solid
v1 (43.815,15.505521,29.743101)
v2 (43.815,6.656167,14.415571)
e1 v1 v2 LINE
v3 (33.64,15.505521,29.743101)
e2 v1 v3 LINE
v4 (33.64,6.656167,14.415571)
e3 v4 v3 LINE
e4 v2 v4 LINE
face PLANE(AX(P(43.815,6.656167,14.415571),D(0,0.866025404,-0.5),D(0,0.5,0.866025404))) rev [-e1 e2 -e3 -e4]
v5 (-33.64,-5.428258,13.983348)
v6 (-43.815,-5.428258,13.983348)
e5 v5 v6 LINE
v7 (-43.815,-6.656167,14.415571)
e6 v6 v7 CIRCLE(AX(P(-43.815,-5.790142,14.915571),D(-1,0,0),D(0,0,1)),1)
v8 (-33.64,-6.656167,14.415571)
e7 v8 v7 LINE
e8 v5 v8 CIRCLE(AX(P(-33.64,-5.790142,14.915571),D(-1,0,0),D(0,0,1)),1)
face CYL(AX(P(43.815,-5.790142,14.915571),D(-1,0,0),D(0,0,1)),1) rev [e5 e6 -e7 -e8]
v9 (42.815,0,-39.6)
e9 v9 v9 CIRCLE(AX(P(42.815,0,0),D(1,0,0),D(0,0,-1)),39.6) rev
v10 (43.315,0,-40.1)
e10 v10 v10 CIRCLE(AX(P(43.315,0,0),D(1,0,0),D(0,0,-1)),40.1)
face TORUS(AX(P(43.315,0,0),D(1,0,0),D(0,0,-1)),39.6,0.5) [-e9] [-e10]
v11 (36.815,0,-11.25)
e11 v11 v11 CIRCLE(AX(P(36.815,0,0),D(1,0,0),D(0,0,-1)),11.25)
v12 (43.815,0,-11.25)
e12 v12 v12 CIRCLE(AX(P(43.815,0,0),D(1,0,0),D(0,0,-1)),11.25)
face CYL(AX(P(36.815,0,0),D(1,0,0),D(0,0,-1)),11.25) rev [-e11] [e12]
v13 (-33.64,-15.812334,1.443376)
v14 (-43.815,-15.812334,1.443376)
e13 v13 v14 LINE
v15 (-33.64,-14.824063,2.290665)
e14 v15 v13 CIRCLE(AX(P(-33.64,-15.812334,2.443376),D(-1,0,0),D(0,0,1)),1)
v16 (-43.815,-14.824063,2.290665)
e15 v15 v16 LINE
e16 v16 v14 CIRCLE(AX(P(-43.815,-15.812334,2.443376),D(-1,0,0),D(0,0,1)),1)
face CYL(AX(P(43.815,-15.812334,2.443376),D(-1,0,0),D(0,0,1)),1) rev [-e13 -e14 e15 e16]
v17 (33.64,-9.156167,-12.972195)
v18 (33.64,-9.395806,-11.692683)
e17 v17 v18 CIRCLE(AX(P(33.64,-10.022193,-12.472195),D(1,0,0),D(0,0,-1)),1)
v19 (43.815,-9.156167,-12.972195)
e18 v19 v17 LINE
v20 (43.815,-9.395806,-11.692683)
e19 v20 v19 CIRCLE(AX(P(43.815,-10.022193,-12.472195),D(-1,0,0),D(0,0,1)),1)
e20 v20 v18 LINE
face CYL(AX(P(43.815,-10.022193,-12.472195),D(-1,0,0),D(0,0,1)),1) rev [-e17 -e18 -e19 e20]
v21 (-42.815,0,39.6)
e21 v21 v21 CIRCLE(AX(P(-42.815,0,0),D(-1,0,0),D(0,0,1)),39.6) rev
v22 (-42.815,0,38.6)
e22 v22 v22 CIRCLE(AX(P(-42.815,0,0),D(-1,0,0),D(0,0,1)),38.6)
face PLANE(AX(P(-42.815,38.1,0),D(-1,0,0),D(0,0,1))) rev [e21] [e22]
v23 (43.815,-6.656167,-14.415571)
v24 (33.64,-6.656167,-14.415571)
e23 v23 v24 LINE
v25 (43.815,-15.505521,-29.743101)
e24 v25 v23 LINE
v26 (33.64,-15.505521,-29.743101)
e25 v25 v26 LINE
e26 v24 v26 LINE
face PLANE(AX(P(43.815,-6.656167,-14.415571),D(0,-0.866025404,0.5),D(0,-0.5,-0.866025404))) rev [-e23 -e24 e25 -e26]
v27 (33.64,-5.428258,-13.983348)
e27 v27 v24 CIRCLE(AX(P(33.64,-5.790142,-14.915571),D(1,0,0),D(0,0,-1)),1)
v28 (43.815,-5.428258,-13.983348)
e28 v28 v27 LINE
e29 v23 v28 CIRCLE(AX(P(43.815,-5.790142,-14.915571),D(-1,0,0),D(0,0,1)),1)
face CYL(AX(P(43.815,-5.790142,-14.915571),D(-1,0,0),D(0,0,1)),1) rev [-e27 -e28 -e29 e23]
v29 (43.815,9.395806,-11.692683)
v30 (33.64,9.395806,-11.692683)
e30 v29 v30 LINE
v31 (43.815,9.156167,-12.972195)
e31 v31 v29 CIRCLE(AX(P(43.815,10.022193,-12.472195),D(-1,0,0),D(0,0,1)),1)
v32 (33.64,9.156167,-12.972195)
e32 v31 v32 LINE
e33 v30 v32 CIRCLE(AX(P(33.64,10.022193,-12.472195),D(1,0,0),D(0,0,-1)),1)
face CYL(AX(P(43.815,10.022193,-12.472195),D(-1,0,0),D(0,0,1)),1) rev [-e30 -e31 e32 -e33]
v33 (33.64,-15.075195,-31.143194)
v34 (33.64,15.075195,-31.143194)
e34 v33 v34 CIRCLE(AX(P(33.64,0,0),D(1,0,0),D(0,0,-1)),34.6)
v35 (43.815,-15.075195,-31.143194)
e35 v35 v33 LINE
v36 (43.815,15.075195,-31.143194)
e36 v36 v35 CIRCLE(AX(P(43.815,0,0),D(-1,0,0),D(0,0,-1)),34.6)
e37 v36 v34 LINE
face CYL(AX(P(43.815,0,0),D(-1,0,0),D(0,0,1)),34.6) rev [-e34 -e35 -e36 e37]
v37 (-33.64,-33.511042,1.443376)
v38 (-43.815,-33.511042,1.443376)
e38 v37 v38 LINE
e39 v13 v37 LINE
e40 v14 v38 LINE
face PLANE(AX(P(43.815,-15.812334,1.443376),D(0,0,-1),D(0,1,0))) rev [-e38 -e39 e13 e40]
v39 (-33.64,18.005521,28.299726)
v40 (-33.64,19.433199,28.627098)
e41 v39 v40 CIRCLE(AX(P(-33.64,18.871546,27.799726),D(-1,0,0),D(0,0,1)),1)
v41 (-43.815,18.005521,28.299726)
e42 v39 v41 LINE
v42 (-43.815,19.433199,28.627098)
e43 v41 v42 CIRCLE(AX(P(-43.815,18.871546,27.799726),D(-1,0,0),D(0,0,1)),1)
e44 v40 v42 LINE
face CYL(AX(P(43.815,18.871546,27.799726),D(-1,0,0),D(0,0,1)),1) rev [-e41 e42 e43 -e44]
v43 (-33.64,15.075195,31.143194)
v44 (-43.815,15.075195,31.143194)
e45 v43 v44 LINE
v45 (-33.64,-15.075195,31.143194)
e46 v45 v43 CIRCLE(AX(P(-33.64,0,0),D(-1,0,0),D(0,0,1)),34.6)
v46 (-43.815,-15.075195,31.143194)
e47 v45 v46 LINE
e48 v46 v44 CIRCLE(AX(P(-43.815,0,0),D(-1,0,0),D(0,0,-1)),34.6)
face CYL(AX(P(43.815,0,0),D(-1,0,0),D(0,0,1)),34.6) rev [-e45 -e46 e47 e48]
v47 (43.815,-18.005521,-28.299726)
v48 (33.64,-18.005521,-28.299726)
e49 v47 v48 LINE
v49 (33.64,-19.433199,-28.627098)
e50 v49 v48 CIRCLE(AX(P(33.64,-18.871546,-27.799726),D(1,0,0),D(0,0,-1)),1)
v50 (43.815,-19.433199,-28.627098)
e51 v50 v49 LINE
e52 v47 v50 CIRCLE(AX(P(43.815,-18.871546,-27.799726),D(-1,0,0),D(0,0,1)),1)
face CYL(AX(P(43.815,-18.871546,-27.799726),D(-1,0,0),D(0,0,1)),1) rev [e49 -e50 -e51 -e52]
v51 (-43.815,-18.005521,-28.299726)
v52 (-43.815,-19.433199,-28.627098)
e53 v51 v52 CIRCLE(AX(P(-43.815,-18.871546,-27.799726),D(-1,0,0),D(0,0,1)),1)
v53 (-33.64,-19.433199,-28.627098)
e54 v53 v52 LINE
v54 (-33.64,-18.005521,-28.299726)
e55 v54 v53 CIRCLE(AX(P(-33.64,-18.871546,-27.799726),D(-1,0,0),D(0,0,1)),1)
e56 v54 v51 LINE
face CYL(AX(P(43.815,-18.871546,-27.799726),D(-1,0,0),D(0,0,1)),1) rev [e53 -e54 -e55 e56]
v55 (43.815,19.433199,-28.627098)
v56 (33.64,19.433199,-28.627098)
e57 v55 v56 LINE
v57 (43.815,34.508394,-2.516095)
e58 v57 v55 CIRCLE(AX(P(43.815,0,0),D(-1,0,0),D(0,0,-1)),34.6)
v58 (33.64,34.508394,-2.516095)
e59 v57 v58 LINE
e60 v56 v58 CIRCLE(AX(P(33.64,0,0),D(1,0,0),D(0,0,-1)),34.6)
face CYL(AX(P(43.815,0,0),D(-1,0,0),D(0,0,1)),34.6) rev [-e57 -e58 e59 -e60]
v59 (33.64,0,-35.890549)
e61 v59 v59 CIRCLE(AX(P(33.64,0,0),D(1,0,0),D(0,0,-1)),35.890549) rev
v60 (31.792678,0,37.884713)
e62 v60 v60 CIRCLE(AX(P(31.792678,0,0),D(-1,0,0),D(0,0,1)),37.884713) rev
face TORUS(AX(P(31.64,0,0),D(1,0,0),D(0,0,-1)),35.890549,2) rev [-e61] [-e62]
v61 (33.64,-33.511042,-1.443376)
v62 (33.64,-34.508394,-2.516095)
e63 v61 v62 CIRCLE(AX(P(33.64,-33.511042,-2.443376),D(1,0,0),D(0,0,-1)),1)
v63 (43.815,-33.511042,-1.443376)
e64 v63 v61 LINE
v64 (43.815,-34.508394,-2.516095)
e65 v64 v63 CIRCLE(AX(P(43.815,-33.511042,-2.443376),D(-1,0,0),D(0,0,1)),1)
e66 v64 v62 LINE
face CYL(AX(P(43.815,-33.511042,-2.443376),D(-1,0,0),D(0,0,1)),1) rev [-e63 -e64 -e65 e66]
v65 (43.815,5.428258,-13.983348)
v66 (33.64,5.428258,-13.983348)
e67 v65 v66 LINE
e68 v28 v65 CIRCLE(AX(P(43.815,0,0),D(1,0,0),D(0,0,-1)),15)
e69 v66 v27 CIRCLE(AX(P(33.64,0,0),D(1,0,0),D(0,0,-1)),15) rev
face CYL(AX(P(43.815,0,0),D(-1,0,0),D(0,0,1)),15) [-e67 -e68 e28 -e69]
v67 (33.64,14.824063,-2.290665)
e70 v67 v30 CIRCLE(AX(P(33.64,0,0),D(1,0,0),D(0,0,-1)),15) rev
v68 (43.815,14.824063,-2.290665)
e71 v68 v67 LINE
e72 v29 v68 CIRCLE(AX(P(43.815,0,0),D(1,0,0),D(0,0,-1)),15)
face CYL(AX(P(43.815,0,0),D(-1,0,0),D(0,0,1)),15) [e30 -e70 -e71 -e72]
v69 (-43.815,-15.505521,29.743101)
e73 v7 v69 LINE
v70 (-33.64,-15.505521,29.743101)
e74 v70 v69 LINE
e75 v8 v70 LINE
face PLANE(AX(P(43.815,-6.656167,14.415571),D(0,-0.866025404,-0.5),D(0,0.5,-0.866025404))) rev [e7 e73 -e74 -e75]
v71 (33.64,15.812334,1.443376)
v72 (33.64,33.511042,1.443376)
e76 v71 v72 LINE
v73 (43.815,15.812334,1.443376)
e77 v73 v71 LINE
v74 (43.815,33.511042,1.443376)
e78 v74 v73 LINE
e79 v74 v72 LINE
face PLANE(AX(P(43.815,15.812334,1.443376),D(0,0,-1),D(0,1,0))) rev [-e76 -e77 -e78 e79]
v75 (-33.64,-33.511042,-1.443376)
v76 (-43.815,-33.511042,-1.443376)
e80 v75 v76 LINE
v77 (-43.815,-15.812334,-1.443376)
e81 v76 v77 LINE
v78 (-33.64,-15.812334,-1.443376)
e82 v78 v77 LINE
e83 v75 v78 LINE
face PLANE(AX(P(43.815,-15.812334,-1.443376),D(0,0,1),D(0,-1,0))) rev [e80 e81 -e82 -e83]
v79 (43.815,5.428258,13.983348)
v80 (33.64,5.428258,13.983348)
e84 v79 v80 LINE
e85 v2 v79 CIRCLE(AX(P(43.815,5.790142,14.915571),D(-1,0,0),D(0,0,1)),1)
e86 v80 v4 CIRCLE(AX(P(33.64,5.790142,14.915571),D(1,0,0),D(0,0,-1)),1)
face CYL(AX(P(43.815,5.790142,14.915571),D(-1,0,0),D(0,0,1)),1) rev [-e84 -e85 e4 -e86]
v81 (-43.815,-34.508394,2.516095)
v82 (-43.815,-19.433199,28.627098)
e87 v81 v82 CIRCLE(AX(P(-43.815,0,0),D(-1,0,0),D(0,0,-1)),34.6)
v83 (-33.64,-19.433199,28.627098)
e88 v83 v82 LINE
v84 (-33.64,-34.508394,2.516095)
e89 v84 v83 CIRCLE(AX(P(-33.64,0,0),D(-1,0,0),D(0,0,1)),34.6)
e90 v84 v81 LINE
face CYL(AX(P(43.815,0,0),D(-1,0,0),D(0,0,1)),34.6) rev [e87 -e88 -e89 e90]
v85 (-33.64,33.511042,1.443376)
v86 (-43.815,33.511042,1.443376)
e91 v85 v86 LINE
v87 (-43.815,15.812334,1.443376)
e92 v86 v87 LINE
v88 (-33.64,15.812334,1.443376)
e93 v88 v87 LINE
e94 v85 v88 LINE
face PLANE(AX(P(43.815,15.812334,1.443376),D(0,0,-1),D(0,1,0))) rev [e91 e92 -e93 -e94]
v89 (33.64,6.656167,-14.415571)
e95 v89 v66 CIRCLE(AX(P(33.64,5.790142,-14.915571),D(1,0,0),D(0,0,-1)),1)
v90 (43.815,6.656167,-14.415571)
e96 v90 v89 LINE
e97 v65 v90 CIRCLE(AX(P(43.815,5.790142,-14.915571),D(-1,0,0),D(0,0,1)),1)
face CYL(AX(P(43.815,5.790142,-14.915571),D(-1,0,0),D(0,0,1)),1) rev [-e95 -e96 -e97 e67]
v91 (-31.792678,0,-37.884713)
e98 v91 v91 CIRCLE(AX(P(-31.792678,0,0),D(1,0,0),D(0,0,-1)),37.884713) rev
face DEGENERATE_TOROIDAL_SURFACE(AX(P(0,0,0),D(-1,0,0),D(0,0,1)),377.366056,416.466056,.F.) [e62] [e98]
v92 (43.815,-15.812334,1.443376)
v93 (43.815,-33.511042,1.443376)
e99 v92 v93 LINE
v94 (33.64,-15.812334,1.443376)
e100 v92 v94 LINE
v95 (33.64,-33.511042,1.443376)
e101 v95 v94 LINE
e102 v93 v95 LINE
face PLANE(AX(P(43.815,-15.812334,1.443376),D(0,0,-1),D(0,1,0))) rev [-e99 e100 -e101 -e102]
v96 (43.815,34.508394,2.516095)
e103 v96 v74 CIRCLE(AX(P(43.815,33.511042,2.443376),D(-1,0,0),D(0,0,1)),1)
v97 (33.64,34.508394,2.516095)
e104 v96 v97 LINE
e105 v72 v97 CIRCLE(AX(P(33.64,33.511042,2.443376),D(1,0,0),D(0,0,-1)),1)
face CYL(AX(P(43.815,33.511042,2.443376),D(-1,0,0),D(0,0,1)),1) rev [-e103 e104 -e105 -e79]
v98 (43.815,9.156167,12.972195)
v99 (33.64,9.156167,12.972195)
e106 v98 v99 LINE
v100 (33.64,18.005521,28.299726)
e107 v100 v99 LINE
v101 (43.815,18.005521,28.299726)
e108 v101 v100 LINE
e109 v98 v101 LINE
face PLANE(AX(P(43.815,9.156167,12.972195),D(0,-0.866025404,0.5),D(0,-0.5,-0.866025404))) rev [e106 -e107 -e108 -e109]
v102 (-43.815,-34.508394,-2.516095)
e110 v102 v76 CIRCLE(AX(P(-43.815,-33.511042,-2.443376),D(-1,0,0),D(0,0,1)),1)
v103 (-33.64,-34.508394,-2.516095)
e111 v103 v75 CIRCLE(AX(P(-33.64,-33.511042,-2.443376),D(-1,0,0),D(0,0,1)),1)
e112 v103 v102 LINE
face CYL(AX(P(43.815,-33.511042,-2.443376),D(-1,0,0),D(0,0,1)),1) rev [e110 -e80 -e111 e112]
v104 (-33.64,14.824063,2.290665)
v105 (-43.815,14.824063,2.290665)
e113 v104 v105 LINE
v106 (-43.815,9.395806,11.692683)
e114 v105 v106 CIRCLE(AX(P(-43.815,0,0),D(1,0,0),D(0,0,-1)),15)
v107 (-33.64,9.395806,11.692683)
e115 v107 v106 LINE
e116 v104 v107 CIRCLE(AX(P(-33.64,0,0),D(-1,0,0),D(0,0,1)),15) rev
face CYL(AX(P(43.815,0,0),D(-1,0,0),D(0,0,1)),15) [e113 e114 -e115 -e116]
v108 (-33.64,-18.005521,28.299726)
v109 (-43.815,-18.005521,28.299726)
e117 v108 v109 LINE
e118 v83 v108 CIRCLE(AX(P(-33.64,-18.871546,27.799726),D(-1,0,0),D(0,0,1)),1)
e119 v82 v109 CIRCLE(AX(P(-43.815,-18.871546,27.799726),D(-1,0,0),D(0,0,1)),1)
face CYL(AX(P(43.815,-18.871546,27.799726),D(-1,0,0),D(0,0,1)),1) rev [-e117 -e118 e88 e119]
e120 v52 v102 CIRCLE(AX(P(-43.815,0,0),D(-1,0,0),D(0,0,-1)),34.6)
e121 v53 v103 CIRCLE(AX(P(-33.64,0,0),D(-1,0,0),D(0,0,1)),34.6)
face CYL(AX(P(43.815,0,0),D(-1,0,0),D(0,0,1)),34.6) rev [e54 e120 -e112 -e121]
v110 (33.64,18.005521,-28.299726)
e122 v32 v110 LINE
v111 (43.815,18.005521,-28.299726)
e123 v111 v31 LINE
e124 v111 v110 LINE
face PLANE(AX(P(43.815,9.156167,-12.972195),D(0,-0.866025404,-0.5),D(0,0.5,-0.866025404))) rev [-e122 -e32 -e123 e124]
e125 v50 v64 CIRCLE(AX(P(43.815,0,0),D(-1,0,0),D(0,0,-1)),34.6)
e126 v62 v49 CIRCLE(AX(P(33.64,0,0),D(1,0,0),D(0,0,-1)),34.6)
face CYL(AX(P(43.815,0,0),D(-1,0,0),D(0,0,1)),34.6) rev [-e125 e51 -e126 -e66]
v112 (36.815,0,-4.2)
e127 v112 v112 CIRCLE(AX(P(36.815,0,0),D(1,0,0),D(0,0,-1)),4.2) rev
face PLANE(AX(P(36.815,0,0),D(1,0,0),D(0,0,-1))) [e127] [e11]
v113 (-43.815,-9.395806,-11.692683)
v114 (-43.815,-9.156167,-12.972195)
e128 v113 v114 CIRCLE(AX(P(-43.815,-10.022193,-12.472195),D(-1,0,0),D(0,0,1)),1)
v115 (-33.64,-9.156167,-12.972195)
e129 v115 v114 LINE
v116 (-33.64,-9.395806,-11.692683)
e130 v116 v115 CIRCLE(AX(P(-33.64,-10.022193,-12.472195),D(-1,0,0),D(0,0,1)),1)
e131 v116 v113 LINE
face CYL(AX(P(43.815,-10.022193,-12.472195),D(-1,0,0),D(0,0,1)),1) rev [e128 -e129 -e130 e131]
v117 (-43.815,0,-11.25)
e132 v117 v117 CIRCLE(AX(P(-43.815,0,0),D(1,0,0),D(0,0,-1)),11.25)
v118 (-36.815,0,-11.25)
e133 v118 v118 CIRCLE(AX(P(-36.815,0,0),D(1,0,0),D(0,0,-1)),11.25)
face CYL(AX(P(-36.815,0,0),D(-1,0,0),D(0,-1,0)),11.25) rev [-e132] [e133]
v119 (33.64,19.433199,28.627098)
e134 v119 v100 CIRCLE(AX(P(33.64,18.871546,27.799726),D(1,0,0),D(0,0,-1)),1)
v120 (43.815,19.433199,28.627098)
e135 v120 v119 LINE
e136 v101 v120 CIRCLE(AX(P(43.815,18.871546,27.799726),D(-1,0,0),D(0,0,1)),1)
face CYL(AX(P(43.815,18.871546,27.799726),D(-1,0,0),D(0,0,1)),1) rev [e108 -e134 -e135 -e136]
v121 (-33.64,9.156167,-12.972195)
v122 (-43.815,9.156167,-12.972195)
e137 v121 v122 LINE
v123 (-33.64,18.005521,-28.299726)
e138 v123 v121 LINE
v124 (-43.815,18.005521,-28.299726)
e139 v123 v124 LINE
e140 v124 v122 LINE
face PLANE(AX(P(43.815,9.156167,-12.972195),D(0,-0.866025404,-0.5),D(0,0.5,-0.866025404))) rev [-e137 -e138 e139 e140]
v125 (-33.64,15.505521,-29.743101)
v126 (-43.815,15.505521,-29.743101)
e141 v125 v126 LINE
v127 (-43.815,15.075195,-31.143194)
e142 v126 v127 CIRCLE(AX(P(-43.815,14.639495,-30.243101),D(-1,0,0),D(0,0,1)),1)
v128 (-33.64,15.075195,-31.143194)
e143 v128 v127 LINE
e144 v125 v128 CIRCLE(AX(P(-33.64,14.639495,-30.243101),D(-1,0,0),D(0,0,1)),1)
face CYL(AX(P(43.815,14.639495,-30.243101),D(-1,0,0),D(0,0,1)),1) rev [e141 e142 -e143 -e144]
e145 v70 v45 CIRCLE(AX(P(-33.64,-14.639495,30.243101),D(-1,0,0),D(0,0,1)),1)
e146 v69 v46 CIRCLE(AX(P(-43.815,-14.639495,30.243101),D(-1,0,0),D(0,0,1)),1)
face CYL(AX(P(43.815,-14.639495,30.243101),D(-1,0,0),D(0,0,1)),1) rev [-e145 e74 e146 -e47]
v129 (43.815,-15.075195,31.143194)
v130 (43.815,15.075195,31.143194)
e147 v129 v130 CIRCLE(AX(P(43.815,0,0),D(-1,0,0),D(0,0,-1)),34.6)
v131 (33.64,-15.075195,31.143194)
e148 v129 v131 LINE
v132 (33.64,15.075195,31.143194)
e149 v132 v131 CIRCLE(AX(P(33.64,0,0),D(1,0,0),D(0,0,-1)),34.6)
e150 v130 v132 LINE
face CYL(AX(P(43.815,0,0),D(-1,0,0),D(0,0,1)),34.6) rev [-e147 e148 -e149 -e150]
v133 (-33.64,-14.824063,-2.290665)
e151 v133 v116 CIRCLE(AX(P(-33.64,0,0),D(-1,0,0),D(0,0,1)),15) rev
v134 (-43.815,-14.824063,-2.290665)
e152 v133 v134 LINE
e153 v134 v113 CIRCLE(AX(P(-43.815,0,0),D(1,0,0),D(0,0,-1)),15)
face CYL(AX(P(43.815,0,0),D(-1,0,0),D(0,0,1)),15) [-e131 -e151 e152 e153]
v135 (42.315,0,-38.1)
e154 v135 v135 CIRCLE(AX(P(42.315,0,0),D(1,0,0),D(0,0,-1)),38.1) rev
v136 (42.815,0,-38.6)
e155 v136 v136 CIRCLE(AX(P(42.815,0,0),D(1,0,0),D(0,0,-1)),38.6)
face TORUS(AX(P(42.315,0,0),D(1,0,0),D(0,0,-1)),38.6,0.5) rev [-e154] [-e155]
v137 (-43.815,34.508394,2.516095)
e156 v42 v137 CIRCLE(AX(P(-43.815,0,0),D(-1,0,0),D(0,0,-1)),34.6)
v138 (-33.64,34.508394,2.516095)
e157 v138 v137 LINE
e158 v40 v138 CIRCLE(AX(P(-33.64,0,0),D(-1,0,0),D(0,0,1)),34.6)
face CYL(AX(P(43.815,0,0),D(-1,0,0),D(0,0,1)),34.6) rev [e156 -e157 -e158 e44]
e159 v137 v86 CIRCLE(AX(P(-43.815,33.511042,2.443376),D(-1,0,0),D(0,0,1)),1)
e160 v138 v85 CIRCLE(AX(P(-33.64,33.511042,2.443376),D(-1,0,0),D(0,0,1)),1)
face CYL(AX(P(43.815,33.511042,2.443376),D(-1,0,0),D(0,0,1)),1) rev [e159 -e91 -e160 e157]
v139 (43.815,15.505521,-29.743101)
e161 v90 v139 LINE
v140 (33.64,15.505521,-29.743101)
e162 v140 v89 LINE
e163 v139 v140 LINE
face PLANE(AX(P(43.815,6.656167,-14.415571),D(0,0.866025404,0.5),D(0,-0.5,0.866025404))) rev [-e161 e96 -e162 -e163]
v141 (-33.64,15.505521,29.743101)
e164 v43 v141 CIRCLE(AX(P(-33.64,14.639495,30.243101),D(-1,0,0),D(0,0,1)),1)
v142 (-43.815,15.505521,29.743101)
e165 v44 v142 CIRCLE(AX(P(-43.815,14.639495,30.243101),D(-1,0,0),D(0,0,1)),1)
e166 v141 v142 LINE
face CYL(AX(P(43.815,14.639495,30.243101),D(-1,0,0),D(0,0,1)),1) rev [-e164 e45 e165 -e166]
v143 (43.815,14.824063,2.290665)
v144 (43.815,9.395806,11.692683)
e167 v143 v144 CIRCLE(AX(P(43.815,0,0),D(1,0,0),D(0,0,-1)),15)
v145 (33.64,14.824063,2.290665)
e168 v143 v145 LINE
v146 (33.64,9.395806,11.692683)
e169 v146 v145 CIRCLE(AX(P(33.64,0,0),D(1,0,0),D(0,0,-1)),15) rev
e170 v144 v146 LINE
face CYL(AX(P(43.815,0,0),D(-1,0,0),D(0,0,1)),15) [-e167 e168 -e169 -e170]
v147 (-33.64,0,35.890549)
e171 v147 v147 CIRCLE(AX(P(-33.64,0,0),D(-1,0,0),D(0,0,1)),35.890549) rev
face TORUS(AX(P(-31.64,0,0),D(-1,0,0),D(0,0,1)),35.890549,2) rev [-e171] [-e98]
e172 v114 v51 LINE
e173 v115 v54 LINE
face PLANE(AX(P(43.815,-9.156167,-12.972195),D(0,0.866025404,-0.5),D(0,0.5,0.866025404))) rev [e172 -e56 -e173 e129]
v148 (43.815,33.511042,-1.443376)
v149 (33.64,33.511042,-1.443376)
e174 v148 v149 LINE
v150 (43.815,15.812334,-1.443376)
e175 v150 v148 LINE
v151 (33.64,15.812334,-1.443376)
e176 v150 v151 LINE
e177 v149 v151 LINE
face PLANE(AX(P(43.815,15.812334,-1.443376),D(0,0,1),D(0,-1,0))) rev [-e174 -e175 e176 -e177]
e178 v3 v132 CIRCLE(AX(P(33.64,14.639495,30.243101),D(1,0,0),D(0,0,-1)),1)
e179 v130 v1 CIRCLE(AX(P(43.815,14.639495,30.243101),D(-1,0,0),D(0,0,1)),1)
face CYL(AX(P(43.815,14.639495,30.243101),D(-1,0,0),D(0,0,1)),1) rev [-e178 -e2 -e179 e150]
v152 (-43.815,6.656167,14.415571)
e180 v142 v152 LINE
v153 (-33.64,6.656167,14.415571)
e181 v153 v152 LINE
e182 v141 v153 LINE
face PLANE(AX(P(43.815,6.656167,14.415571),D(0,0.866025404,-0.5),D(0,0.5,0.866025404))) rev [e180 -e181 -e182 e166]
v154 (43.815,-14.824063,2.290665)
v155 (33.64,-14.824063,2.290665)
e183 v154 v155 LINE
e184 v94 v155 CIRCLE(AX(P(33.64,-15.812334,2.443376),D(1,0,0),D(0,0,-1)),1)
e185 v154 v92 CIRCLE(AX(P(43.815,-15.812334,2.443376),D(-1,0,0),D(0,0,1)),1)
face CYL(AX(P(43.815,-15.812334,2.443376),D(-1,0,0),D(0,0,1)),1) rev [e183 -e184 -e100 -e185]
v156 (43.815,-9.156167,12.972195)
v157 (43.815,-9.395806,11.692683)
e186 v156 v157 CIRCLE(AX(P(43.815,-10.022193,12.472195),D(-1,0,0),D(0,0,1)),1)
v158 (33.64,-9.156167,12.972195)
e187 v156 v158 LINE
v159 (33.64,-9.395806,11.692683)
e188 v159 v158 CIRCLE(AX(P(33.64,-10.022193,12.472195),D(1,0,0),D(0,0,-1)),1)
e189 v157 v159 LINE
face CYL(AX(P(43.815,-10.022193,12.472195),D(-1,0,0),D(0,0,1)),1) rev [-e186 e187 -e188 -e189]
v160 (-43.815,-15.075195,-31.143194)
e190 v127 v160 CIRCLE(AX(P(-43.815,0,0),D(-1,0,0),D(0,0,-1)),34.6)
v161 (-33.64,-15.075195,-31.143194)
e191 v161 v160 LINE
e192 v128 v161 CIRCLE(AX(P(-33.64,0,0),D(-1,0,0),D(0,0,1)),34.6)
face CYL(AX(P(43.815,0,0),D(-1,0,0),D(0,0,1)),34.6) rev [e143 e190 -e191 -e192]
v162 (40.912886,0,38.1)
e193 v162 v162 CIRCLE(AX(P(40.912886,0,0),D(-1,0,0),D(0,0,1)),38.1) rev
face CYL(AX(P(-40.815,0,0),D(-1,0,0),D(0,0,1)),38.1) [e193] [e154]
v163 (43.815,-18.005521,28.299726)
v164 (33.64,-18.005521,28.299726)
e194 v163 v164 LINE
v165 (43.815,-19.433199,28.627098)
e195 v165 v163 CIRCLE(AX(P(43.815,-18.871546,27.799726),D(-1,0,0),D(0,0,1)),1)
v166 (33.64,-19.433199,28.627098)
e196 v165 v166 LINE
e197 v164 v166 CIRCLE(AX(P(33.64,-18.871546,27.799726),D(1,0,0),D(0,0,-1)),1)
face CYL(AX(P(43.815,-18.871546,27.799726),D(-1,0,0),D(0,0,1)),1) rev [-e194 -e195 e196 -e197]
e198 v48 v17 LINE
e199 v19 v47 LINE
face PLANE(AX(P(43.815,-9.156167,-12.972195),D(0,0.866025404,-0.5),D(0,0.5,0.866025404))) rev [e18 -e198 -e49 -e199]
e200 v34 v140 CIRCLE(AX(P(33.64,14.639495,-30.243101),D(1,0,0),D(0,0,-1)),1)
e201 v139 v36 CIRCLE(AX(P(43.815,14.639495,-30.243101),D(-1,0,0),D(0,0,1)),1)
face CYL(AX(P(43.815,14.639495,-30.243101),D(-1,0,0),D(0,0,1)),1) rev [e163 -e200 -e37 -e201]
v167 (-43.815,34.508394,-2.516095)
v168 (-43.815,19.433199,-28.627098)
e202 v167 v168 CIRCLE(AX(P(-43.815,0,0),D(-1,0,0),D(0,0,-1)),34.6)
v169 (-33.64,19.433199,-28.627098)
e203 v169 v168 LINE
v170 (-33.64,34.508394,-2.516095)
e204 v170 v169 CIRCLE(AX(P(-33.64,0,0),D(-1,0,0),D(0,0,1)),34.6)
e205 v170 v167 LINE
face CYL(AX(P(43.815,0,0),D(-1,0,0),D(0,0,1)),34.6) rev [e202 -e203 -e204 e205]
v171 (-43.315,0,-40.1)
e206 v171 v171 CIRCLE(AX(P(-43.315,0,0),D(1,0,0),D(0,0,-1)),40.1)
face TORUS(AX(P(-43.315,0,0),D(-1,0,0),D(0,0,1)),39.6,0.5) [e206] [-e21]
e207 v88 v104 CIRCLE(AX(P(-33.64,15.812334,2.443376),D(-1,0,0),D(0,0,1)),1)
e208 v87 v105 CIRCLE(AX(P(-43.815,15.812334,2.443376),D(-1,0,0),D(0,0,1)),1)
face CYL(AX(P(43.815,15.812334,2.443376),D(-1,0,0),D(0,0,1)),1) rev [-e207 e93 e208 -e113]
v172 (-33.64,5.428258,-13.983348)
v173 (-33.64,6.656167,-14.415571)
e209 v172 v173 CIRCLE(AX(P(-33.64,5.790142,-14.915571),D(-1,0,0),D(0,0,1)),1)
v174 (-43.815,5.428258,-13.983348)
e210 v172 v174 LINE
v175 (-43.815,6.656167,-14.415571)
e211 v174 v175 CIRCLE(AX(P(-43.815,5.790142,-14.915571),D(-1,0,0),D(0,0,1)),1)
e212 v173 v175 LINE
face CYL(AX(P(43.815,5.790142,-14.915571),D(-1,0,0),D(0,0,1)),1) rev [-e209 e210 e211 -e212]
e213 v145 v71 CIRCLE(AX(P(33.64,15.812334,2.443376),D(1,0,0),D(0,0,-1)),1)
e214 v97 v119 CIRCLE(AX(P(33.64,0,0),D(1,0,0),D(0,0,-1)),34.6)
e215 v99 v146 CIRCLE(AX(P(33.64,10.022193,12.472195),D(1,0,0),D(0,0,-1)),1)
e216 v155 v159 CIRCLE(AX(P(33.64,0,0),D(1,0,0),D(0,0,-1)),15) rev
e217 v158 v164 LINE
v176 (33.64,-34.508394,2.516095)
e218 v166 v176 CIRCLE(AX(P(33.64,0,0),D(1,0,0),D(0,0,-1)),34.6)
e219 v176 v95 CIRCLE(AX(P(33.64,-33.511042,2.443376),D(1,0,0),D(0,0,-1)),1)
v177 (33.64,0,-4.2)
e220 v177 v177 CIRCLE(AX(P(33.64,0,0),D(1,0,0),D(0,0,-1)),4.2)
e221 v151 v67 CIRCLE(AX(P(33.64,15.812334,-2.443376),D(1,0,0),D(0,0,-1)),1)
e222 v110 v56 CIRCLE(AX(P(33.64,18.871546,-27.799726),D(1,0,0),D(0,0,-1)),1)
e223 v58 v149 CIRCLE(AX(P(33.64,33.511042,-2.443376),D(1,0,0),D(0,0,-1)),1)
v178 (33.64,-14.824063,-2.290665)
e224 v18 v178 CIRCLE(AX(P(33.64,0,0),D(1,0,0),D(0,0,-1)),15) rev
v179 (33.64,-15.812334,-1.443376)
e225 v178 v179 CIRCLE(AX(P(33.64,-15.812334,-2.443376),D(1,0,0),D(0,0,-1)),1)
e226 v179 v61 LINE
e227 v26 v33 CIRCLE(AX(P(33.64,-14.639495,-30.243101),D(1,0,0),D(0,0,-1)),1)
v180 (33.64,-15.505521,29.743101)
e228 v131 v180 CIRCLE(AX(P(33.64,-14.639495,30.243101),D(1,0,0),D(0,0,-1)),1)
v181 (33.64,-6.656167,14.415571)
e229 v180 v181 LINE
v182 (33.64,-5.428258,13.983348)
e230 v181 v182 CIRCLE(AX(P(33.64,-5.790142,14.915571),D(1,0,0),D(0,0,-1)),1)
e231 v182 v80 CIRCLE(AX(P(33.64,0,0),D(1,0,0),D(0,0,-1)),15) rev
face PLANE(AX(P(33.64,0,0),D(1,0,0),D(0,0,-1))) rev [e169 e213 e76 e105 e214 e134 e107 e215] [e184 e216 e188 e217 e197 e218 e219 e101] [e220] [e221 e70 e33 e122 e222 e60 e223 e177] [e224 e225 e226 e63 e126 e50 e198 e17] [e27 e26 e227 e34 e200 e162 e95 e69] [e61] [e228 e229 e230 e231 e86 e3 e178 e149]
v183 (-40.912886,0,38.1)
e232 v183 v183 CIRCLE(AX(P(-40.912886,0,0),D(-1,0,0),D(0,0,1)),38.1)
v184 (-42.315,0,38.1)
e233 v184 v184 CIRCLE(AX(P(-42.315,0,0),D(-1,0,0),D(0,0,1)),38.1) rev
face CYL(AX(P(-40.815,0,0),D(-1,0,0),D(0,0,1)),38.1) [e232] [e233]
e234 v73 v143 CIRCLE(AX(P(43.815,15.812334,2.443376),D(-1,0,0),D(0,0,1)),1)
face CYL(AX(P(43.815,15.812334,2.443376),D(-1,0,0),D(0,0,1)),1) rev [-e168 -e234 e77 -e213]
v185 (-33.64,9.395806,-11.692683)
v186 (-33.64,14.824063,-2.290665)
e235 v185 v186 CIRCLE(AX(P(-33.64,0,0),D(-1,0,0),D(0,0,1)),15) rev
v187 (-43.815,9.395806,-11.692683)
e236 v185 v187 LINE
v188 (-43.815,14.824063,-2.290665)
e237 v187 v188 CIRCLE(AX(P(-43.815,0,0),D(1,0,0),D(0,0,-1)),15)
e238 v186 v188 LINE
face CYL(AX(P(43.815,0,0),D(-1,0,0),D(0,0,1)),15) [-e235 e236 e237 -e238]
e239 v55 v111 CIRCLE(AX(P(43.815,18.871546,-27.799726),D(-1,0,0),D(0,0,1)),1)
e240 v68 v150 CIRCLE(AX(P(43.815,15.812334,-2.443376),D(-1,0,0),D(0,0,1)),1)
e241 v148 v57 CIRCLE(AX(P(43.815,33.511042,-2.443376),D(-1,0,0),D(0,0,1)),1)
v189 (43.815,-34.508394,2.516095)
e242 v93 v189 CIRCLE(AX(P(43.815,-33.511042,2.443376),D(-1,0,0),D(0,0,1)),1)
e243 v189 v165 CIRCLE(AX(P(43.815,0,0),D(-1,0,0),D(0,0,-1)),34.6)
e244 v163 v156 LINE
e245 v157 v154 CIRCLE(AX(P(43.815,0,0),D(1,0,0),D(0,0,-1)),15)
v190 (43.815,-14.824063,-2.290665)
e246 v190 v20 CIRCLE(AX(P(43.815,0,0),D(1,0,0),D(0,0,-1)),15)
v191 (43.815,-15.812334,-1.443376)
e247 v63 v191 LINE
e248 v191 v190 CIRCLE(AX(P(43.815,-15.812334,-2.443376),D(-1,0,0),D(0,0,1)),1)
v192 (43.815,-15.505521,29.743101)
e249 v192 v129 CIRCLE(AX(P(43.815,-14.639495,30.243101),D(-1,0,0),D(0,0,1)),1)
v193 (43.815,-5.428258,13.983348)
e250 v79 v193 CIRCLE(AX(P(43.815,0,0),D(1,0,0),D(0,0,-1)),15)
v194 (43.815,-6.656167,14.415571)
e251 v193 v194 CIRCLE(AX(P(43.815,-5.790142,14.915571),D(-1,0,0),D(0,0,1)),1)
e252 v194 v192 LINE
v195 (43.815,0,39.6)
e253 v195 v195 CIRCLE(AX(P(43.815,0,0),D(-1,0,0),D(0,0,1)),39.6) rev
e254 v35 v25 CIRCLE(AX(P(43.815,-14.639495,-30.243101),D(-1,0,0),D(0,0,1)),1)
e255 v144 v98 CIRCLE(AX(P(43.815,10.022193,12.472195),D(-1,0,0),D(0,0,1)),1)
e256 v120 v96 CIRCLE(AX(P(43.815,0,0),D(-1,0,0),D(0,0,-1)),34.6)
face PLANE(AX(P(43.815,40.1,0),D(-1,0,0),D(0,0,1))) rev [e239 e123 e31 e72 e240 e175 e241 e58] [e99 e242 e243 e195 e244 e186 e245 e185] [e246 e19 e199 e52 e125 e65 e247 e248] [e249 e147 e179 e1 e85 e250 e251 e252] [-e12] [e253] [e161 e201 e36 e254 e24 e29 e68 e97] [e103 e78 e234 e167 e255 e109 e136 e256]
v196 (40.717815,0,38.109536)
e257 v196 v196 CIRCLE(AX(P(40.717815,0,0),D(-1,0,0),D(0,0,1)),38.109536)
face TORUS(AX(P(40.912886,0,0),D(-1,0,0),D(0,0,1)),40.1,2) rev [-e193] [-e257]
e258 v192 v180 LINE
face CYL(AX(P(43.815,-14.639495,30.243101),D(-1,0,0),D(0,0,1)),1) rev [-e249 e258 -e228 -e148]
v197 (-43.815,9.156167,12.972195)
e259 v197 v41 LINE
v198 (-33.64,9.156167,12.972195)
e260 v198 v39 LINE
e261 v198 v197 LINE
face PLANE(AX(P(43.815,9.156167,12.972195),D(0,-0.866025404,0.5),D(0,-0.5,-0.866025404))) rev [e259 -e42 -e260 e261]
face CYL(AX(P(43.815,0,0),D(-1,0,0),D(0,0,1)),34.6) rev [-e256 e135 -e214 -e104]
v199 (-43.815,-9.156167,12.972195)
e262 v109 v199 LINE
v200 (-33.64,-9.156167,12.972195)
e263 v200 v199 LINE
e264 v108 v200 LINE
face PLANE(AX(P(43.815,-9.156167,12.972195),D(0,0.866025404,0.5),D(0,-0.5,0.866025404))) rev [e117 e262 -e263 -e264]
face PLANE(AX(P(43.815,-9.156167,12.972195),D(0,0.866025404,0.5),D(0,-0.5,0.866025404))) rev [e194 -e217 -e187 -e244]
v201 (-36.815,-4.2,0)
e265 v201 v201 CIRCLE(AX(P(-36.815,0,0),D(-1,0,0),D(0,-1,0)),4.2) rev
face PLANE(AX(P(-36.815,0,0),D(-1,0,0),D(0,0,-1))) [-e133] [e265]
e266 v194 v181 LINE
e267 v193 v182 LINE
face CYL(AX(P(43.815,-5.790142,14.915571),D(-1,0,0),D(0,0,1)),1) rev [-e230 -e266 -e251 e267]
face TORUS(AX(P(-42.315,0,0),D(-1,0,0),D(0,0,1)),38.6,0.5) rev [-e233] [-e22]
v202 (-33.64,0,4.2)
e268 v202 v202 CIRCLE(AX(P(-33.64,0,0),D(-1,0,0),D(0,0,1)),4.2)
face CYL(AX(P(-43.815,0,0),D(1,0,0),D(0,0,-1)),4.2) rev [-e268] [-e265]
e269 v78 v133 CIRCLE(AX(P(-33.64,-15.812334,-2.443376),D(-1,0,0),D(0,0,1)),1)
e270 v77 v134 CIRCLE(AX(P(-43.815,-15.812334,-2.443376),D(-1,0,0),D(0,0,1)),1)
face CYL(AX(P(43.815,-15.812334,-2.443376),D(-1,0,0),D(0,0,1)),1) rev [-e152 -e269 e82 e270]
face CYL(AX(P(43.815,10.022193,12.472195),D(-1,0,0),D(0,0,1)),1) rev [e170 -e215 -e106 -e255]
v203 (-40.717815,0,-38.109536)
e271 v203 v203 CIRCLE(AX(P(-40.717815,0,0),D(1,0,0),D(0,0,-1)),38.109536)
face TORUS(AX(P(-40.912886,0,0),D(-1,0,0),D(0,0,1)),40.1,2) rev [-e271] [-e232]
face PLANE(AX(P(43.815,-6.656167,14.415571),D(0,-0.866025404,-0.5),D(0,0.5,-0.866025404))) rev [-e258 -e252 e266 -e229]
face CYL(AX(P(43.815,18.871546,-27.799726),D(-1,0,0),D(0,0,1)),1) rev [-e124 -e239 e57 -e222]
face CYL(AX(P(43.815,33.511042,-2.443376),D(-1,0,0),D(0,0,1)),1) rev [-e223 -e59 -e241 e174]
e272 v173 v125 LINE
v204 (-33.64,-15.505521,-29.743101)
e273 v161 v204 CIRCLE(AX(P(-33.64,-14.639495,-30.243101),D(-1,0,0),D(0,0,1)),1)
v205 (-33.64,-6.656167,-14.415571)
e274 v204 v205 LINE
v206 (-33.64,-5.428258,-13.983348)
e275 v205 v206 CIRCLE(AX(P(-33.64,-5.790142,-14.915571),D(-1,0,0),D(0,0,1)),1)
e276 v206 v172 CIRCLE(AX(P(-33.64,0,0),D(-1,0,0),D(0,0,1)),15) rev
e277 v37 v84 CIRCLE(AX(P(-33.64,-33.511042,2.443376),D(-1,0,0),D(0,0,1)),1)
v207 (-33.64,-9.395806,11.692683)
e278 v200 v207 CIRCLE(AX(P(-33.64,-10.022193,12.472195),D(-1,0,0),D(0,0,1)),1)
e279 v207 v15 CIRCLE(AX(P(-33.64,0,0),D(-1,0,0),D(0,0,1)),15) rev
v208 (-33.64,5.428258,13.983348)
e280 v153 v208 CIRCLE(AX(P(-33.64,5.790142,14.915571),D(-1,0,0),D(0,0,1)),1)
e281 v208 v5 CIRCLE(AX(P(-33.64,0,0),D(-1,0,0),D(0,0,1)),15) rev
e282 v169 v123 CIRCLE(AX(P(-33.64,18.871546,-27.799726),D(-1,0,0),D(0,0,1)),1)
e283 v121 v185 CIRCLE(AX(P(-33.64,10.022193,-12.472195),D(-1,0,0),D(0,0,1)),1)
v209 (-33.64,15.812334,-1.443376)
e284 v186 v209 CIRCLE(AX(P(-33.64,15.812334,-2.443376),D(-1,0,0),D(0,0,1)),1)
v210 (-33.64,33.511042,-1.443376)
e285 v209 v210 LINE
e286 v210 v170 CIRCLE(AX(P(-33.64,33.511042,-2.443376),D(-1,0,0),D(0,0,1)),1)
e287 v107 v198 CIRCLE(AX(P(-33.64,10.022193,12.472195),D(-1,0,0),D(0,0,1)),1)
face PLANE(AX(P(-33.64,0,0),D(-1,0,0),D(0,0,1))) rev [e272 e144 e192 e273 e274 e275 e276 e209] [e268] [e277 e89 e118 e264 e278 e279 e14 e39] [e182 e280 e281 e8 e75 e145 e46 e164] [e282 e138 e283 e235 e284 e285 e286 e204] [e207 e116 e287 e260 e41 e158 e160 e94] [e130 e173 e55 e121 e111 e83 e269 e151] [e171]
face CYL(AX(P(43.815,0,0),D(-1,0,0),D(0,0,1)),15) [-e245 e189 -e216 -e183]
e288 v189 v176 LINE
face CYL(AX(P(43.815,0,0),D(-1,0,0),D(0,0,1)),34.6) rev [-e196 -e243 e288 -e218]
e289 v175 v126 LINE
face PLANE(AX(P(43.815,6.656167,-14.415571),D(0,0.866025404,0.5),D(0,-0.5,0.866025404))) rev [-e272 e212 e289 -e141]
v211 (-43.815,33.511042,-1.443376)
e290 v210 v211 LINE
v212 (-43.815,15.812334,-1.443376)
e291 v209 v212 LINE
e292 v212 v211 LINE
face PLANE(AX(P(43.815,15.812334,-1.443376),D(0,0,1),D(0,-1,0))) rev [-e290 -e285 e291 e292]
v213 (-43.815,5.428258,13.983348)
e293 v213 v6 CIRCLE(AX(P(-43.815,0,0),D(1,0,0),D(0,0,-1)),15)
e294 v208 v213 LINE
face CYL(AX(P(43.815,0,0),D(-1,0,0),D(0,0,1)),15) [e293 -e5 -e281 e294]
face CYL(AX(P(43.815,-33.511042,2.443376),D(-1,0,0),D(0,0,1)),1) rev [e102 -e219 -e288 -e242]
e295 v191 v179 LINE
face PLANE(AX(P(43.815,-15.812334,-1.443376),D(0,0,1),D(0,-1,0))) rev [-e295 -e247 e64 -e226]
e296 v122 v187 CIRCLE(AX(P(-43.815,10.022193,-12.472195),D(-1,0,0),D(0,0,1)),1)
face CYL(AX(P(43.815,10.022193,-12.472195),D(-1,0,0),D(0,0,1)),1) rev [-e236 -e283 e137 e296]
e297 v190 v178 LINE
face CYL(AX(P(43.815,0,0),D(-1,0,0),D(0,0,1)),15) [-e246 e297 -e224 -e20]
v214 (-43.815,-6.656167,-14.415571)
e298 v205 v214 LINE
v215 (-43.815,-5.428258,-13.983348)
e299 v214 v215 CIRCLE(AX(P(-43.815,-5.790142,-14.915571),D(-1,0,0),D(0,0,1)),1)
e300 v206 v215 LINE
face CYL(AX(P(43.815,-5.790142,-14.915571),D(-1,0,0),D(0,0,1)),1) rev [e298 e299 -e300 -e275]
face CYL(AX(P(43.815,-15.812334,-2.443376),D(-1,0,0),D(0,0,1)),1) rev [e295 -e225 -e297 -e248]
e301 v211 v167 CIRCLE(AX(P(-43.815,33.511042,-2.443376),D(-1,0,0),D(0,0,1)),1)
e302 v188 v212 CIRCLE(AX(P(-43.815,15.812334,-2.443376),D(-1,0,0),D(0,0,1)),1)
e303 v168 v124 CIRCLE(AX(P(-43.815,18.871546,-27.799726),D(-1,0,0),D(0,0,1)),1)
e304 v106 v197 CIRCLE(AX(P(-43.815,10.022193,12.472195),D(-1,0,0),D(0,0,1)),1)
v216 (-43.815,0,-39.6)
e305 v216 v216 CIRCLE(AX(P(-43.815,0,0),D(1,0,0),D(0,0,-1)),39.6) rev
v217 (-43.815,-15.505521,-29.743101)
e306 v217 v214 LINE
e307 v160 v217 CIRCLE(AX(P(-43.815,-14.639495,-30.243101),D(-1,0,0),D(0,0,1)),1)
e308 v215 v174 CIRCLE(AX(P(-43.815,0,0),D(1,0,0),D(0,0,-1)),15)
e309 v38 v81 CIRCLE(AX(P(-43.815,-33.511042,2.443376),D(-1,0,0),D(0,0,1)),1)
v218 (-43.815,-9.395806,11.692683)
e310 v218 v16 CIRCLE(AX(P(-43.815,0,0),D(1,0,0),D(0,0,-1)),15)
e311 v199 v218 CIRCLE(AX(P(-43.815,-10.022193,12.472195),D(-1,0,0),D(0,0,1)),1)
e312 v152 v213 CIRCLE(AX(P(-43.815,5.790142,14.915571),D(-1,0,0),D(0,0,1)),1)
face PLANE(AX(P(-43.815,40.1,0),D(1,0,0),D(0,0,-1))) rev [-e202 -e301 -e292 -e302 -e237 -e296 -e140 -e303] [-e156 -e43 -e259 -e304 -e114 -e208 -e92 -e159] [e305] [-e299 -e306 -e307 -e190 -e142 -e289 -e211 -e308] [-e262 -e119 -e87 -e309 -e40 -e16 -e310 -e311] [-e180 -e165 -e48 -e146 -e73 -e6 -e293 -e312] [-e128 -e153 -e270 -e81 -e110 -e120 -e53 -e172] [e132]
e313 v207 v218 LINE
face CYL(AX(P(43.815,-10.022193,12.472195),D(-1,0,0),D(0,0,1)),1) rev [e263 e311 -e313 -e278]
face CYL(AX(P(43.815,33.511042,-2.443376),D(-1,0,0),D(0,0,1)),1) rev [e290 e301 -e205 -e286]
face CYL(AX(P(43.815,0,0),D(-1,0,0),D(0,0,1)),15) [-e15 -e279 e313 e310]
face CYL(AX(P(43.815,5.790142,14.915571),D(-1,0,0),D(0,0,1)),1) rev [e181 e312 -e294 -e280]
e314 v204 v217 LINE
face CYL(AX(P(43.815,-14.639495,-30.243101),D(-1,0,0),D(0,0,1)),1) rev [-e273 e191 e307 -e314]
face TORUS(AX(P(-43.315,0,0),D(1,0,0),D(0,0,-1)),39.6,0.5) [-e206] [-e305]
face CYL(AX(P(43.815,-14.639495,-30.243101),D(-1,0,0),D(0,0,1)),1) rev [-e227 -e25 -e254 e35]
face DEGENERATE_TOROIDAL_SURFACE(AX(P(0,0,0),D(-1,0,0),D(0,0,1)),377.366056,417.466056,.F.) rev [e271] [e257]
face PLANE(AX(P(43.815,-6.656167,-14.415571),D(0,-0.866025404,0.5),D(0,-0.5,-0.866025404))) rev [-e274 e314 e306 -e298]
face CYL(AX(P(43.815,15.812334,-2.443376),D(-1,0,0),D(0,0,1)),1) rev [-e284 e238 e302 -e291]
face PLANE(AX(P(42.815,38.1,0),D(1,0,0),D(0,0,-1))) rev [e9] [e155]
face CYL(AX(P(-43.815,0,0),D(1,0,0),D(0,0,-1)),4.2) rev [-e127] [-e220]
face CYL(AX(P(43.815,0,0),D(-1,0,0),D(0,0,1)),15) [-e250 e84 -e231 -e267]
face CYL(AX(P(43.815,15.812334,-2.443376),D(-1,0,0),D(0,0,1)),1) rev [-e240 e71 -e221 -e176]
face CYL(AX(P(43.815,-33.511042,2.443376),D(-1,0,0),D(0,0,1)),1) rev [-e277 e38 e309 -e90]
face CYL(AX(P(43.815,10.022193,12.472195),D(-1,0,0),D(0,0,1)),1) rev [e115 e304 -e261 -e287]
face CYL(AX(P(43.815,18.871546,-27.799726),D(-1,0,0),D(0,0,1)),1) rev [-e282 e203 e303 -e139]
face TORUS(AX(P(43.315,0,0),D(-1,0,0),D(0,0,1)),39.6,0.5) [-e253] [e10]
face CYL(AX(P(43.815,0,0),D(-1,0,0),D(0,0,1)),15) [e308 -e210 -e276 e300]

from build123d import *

# Parameters (mm, degrees)
FILLET2_R               = 2
FILLET1_R               = 0.5
CUT_EXTRUDE2_DEPTH      = 105.379293521
CUT_EXTRUDE5_DEPTH      = 105.379293521
CUT_EXTRUDE5_DEPTH_BACK = 105.379293521
SKETCH7_R               = 4.2
SKETCH8_R               = 11.25
CUT_EXTRUDE6_DEPTH      = 7


# Some blends are built 0.0001 mm under size
with BuildPart() as part:
    # Sketch1 → Revolve2 (revolve)
    with BuildSketch(Plane.XY, mode=Mode.PRIVATE) as revolve2_sk:
        with BuildLine():
            Line((-40.815, 38.1), (-42.815, 38.1))
            Line((-42.815, 38.1), (-42.815, 40.1))
            Line((-42.815, 40.1), (-43.815, 40.1))
            Line((-43.815, 40.1), (-43.815, 0))
            Line((-43.815, 0), (-33.64, 0))
            Line((-33.64, 0), (-33.64, 37.739142957))
            ThreePointArc((-33.64, 37.739142957), (0, 39.1), (33.64, 37.739142957))
            Line((33.64, 37.739142957), (33.64, 0))
            Line((33.64, 0), (43.815, 0))
            Line((43.815, 0), (43.815, 40.1))
            Line((43.815, 40.1), (42.815, 40.1))
            Line((42.815, 40.1), (42.815, 38.1))
            Line((42.815, 38.1), (40.815, 38.1))
            ThreePointArc((40.815, 38.1), (0, 40.1), (-40.815, 38.1))
        make_face()
    revolve(revolve2_sk.sketch.rotate(Axis((-40.815, 0, 0), (1, 0, 0)), 90), axis=Axis((-40.815, 0, 0), (1, 0, 0)))

    # Fillet2
    # the kernel refuses this fillet: 2 mm, written as the material it adds along each edge
    with BuildSketch(Plane(origin=(-33.64, 0, 0), x_dir=(0, 0, 1), z_dir=(0, 1, 0))) as fillet2_piece_1:
        with BuildLine():
            CenterArc((35.890549485, 2), FILLET2_R, 270, 85.621827551)
            ThreePointArc((37.884713299, 1.847321635), (37.812955576, 0.923579854), (37.739142957, 0))
            Line((37.739142957, 0), (35.890549485, 0))
        make_face()
    revolve(axis=Axis((-33.64, 0, 0), (1, 0, 0)))
    with BuildSketch(Plane(origin=(33.64, 0, 0), x_dir=(0, 0, 1), z_dir=(0, 1, 0))) as fillet2_piece_2:
        with BuildLine():
            CenterArc((35.890549485, -2), FILLET2_R, 4.378172449, 85.621827551)
            Line((35.890549485, 0), (37.739142957, 0))
            ThreePointArc((37.739142957, 0), (37.812955576, -0.923579854), (37.884713299, -1.847321635))
        make_face()
    revolve(axis=Axis((33.64, 0, 0), (1, 0, 0)))
    with BuildSketch(Plane(origin=(40.815, 0, 0), x_dir=(0, 0, 1), z_dir=(0, 1, 0))) as fillet2_piece_3:
        with BuildLine():
            CenterArc((40.1, 0.097885806), FILLET2_R, 180, 5.597278626)
            ThreePointArc((38.109535933, -0.097185452), (38.104770808, -0.048592447), (38.1, 0))
            Line((38.1, 0), (38.1, 0.097885806))
        make_face()
    revolve(axis=Axis((40.815, 0, 0), (1, 0, 0)))
    with BuildSketch(Plane(origin=(-40.815, 0, 0), x_dir=(0, 0, 1), z_dir=(0, 1, 0))) as fillet2_piece_4:
        with BuildLine():
            CenterArc((40.1, -0.097885806), FILLET2_R, 174.402721374, 5.597278626)
            Line((38.1, -0.097885806), (38.1, 0))
            ThreePointArc((38.1, 0), (38.104770808, 0.048592447), (38.109535933, 0.097185452))
        make_face()
    revolve(axis=Axis((-40.815, 0, 0), (1, 0, 0)))

    # Fillet1
    fillet1_edges = [part.edges().sort_by_distance(p)[0] for p in [
        (-42.815, 0, -40.1),
        (-43.815, 0, -40.1),
        (43.815, 0, -40.1),
        (42.815, 0, -40.1),
        (42.815, 0, -38.1),
        (-42.815, 0, -38.1),
    ]]
    fillet(fillet1_edges, radius=FILLET1_R - 0.0001)  # a hair under: the kernel refuses the full size

    # Sketch2 → Cut-Extrude2 (cut, through all)
    with BuildSketch(Plane.ZY.offset(43.815)):
        with BuildLine():
            Line((14.415571014, 6.656167139), (29.74310125, 15.505520846))
            ThreePointArc((29.74310125, 15.505520846), (30.536893025, 15.595364886), (31.143193549, 15.075194712))
            ThreePointArc((31.143193549, 15.075194712), (34.6, 0), (31.143193549, -15.075194712))
            ThreePointArc((31.143193549, -15.075194712), (30.536893025, -15.595364886), (29.74310125, -15.505520846))
            Line((29.74310125, -15.505520846), (14.415571014, -6.656167139))
            ThreePointArc((14.415571014, -6.656167139), (13.972302174, -6.122171697), (13.983347826, -5.428257877))
            ThreePointArc((13.983347826, -5.428257877), (15, 0), (13.983347826, 5.428257877))
            ThreePointArc((13.983347826, 5.428257877), (13.972302174, 6.122171697), (14.415571014, 6.656167139))
        make_face()
        with BuildLine():
            Line((12.972195341, -9.156167139), (28.299725577, -18.005520846))
            ThreePointArc((28.299725577, -18.005520846), (28.774428685, -18.64804267), (28.627098362, -19.433199412))
            ThreePointArc((28.627098362, -19.433199412), (17.3, -29.964478971), (2.516095187, -34.508394124))
            ThreePointArc((2.516095187, -34.508394124), (1.76246434, -34.243407555), (1.443375673, -33.511041693))
            Line((1.443375673, -33.511041693), (1.443375673, -15.812334278))
            ThreePointArc((1.443375673, -15.812334278), (1.684194871, -15.161454481), (2.290664693, -14.824063386))
            ThreePointArc((2.290664693, -14.824063386), (7.5, -12.990381057), (11.692683133, -9.395805509))
            ThreePointArc((11.692683133, -9.395805509), (12.288107303, -9.039282784), (12.972195341, -9.156167139))
        make_face()
        with BuildLine():
            Line((-1.443375673, -15.812334278), (-1.443375673, -33.511041693))
            ThreePointArc((-1.443375673, -33.511041693), (-1.76246434, -34.243407555), (-2.516095187, -34.508394124))
            ThreePointArc((-2.516095187, -34.508394124), (-17.3, -29.964478971), (-28.627098362, -19.433199412))
            ThreePointArc((-28.627098362, -19.433199412), (-28.774428685, -18.64804267), (-28.299725577, -18.005520846))
            Line((-28.299725577, -18.005520846), (-12.972195341, -9.156167139))
            ThreePointArc((-12.972195341, -9.156167139), (-12.288107303, -9.039282784), (-11.692683133, -9.395805509))
            ThreePointArc((-11.692683133, -9.395805509), (-7.5, -12.990381057), (-2.290664693, -14.824063386))
            ThreePointArc((-2.290664693, -14.824063386), (-1.684194871, -15.161454481), (-1.443375673, -15.812334278))
        make_face()
        with BuildLine():
            Line((-14.415571014, -6.656167139), (-29.74310125, -15.505520846))
            ThreePointArc((-29.74310125, -15.505520846), (-30.536893025, -15.595364886), (-31.143193549, -15.075194712))
            ThreePointArc((-31.143193549, -15.075194712), (-34.6, 0), (-31.143193549, 15.075194712))
            ThreePointArc((-31.143193549, 15.075194712), (-30.536893025, 15.595364886), (-29.74310125, 15.505520846))
            Line((-29.74310125, 15.505520846), (-14.415571014, 6.656167139))
            ThreePointArc((-14.415571014, 6.656167139), (-13.972302174, 6.122171697), (-13.983347826, 5.428257877))
            ThreePointArc((-13.983347826, 5.428257877), (-15, 0), (-13.983347826, -5.428257877))
            ThreePointArc((-13.983347826, -5.428257877), (-13.972302174, -6.122171697), (-14.415571014, -6.656167139))
        make_face()
        with BuildLine():
            Line((-12.972195341, 9.156167139), (-28.299725577, 18.005520846))
            ThreePointArc((-28.299725577, 18.005520846), (-28.774428685, 18.64804267), (-28.627098362, 19.433199412))
            ThreePointArc((-28.627098362, 19.433199412), (-17.3, 29.964478971), (-2.516095187, 34.508394124))
            ThreePointArc((-2.516095187, 34.508394124), (-1.76246434, 34.243407555), (-1.443375673, 33.511041693))
            Line((-1.443375673, 33.511041693), (-1.443375673, 15.812334278))
            ThreePointArc((-1.443375673, 15.812334278), (-1.684194871, 15.161454481), (-2.290664693, 14.824063386))
            ThreePointArc((-2.290664693, 14.824063386), (-7.5, 12.990381057), (-11.692683133, 9.395805509))
            ThreePointArc((-11.692683133, 9.395805509), (-12.288107303, 9.039282784), (-12.972195341, 9.156167139))
        make_face()
        with BuildLine():
            Line((1.443375673, 15.812334278), (1.443375673, 33.511041693))
            ThreePointArc((1.443375673, 33.511041693), (1.76246434, 34.243407555), (2.516095187, 34.508394124))
            ThreePointArc((2.516095187, 34.508394124), (17.3, 29.964478971), (28.627098362, 19.433199412))
            ThreePointArc((28.627098362, 19.433199412), (28.774428685, 18.64804267), (28.299725577, 18.005520846))
            Line((28.299725577, 18.005520846), (12.972195341, 9.156167139))
            ThreePointArc((12.972195341, 9.156167139), (12.288107303, 9.039282784), (11.692683133, 9.395805509))
            ThreePointArc((11.692683133, 9.395805509), (7.5, 12.990381057), (2.290664693, 14.824063386))
            ThreePointArc((2.290664693, 14.824063386), (1.684194871, 15.161454481), (1.443375673, 15.812334278))
        make_face()
    extrude(amount=-CUT_EXTRUDE2_DEPTH, mode=Mode.SUBTRACT)

    # Sketch7 → Cut-Extrude5 (cut, two sides: drawn at the far end of the back side and taken through both)
    with BuildSketch(Plane(origin=(43.815, 0, 0), x_dir=(0, 0, -1), z_dir=(1, 0, 0)).offset(-CUT_EXTRUDE5_DEPTH_BACK)):
        Circle(SKETCH7_R)
    extrude(amount=CUT_EXTRUDE5_DEPTH + CUT_EXTRUDE5_DEPTH_BACK, mode=Mode.SUBTRACT)

    # Sketch8 → Cut-Extrude6 (cut)
    with BuildSketch(Plane(origin=(43.815, 0, 0), x_dir=(0, 0, -1), z_dir=(1, 0, 0))):
        Circle(SKETCH8_R)
    cut_extrude6 = extrude(amount=-CUT_EXTRUDE6_DEPTH, mode=Mode.SUBTRACT)

    # Mirror1: Cut-Extrude6 across plane
    add(cut_extrude6.mirror(Plane(origin=(0, 0, 0), x_dir=(0, 0, 1), z_dir=(1, 0, 0))), mode=Mode.SUBTRACT)


solid = part.part
